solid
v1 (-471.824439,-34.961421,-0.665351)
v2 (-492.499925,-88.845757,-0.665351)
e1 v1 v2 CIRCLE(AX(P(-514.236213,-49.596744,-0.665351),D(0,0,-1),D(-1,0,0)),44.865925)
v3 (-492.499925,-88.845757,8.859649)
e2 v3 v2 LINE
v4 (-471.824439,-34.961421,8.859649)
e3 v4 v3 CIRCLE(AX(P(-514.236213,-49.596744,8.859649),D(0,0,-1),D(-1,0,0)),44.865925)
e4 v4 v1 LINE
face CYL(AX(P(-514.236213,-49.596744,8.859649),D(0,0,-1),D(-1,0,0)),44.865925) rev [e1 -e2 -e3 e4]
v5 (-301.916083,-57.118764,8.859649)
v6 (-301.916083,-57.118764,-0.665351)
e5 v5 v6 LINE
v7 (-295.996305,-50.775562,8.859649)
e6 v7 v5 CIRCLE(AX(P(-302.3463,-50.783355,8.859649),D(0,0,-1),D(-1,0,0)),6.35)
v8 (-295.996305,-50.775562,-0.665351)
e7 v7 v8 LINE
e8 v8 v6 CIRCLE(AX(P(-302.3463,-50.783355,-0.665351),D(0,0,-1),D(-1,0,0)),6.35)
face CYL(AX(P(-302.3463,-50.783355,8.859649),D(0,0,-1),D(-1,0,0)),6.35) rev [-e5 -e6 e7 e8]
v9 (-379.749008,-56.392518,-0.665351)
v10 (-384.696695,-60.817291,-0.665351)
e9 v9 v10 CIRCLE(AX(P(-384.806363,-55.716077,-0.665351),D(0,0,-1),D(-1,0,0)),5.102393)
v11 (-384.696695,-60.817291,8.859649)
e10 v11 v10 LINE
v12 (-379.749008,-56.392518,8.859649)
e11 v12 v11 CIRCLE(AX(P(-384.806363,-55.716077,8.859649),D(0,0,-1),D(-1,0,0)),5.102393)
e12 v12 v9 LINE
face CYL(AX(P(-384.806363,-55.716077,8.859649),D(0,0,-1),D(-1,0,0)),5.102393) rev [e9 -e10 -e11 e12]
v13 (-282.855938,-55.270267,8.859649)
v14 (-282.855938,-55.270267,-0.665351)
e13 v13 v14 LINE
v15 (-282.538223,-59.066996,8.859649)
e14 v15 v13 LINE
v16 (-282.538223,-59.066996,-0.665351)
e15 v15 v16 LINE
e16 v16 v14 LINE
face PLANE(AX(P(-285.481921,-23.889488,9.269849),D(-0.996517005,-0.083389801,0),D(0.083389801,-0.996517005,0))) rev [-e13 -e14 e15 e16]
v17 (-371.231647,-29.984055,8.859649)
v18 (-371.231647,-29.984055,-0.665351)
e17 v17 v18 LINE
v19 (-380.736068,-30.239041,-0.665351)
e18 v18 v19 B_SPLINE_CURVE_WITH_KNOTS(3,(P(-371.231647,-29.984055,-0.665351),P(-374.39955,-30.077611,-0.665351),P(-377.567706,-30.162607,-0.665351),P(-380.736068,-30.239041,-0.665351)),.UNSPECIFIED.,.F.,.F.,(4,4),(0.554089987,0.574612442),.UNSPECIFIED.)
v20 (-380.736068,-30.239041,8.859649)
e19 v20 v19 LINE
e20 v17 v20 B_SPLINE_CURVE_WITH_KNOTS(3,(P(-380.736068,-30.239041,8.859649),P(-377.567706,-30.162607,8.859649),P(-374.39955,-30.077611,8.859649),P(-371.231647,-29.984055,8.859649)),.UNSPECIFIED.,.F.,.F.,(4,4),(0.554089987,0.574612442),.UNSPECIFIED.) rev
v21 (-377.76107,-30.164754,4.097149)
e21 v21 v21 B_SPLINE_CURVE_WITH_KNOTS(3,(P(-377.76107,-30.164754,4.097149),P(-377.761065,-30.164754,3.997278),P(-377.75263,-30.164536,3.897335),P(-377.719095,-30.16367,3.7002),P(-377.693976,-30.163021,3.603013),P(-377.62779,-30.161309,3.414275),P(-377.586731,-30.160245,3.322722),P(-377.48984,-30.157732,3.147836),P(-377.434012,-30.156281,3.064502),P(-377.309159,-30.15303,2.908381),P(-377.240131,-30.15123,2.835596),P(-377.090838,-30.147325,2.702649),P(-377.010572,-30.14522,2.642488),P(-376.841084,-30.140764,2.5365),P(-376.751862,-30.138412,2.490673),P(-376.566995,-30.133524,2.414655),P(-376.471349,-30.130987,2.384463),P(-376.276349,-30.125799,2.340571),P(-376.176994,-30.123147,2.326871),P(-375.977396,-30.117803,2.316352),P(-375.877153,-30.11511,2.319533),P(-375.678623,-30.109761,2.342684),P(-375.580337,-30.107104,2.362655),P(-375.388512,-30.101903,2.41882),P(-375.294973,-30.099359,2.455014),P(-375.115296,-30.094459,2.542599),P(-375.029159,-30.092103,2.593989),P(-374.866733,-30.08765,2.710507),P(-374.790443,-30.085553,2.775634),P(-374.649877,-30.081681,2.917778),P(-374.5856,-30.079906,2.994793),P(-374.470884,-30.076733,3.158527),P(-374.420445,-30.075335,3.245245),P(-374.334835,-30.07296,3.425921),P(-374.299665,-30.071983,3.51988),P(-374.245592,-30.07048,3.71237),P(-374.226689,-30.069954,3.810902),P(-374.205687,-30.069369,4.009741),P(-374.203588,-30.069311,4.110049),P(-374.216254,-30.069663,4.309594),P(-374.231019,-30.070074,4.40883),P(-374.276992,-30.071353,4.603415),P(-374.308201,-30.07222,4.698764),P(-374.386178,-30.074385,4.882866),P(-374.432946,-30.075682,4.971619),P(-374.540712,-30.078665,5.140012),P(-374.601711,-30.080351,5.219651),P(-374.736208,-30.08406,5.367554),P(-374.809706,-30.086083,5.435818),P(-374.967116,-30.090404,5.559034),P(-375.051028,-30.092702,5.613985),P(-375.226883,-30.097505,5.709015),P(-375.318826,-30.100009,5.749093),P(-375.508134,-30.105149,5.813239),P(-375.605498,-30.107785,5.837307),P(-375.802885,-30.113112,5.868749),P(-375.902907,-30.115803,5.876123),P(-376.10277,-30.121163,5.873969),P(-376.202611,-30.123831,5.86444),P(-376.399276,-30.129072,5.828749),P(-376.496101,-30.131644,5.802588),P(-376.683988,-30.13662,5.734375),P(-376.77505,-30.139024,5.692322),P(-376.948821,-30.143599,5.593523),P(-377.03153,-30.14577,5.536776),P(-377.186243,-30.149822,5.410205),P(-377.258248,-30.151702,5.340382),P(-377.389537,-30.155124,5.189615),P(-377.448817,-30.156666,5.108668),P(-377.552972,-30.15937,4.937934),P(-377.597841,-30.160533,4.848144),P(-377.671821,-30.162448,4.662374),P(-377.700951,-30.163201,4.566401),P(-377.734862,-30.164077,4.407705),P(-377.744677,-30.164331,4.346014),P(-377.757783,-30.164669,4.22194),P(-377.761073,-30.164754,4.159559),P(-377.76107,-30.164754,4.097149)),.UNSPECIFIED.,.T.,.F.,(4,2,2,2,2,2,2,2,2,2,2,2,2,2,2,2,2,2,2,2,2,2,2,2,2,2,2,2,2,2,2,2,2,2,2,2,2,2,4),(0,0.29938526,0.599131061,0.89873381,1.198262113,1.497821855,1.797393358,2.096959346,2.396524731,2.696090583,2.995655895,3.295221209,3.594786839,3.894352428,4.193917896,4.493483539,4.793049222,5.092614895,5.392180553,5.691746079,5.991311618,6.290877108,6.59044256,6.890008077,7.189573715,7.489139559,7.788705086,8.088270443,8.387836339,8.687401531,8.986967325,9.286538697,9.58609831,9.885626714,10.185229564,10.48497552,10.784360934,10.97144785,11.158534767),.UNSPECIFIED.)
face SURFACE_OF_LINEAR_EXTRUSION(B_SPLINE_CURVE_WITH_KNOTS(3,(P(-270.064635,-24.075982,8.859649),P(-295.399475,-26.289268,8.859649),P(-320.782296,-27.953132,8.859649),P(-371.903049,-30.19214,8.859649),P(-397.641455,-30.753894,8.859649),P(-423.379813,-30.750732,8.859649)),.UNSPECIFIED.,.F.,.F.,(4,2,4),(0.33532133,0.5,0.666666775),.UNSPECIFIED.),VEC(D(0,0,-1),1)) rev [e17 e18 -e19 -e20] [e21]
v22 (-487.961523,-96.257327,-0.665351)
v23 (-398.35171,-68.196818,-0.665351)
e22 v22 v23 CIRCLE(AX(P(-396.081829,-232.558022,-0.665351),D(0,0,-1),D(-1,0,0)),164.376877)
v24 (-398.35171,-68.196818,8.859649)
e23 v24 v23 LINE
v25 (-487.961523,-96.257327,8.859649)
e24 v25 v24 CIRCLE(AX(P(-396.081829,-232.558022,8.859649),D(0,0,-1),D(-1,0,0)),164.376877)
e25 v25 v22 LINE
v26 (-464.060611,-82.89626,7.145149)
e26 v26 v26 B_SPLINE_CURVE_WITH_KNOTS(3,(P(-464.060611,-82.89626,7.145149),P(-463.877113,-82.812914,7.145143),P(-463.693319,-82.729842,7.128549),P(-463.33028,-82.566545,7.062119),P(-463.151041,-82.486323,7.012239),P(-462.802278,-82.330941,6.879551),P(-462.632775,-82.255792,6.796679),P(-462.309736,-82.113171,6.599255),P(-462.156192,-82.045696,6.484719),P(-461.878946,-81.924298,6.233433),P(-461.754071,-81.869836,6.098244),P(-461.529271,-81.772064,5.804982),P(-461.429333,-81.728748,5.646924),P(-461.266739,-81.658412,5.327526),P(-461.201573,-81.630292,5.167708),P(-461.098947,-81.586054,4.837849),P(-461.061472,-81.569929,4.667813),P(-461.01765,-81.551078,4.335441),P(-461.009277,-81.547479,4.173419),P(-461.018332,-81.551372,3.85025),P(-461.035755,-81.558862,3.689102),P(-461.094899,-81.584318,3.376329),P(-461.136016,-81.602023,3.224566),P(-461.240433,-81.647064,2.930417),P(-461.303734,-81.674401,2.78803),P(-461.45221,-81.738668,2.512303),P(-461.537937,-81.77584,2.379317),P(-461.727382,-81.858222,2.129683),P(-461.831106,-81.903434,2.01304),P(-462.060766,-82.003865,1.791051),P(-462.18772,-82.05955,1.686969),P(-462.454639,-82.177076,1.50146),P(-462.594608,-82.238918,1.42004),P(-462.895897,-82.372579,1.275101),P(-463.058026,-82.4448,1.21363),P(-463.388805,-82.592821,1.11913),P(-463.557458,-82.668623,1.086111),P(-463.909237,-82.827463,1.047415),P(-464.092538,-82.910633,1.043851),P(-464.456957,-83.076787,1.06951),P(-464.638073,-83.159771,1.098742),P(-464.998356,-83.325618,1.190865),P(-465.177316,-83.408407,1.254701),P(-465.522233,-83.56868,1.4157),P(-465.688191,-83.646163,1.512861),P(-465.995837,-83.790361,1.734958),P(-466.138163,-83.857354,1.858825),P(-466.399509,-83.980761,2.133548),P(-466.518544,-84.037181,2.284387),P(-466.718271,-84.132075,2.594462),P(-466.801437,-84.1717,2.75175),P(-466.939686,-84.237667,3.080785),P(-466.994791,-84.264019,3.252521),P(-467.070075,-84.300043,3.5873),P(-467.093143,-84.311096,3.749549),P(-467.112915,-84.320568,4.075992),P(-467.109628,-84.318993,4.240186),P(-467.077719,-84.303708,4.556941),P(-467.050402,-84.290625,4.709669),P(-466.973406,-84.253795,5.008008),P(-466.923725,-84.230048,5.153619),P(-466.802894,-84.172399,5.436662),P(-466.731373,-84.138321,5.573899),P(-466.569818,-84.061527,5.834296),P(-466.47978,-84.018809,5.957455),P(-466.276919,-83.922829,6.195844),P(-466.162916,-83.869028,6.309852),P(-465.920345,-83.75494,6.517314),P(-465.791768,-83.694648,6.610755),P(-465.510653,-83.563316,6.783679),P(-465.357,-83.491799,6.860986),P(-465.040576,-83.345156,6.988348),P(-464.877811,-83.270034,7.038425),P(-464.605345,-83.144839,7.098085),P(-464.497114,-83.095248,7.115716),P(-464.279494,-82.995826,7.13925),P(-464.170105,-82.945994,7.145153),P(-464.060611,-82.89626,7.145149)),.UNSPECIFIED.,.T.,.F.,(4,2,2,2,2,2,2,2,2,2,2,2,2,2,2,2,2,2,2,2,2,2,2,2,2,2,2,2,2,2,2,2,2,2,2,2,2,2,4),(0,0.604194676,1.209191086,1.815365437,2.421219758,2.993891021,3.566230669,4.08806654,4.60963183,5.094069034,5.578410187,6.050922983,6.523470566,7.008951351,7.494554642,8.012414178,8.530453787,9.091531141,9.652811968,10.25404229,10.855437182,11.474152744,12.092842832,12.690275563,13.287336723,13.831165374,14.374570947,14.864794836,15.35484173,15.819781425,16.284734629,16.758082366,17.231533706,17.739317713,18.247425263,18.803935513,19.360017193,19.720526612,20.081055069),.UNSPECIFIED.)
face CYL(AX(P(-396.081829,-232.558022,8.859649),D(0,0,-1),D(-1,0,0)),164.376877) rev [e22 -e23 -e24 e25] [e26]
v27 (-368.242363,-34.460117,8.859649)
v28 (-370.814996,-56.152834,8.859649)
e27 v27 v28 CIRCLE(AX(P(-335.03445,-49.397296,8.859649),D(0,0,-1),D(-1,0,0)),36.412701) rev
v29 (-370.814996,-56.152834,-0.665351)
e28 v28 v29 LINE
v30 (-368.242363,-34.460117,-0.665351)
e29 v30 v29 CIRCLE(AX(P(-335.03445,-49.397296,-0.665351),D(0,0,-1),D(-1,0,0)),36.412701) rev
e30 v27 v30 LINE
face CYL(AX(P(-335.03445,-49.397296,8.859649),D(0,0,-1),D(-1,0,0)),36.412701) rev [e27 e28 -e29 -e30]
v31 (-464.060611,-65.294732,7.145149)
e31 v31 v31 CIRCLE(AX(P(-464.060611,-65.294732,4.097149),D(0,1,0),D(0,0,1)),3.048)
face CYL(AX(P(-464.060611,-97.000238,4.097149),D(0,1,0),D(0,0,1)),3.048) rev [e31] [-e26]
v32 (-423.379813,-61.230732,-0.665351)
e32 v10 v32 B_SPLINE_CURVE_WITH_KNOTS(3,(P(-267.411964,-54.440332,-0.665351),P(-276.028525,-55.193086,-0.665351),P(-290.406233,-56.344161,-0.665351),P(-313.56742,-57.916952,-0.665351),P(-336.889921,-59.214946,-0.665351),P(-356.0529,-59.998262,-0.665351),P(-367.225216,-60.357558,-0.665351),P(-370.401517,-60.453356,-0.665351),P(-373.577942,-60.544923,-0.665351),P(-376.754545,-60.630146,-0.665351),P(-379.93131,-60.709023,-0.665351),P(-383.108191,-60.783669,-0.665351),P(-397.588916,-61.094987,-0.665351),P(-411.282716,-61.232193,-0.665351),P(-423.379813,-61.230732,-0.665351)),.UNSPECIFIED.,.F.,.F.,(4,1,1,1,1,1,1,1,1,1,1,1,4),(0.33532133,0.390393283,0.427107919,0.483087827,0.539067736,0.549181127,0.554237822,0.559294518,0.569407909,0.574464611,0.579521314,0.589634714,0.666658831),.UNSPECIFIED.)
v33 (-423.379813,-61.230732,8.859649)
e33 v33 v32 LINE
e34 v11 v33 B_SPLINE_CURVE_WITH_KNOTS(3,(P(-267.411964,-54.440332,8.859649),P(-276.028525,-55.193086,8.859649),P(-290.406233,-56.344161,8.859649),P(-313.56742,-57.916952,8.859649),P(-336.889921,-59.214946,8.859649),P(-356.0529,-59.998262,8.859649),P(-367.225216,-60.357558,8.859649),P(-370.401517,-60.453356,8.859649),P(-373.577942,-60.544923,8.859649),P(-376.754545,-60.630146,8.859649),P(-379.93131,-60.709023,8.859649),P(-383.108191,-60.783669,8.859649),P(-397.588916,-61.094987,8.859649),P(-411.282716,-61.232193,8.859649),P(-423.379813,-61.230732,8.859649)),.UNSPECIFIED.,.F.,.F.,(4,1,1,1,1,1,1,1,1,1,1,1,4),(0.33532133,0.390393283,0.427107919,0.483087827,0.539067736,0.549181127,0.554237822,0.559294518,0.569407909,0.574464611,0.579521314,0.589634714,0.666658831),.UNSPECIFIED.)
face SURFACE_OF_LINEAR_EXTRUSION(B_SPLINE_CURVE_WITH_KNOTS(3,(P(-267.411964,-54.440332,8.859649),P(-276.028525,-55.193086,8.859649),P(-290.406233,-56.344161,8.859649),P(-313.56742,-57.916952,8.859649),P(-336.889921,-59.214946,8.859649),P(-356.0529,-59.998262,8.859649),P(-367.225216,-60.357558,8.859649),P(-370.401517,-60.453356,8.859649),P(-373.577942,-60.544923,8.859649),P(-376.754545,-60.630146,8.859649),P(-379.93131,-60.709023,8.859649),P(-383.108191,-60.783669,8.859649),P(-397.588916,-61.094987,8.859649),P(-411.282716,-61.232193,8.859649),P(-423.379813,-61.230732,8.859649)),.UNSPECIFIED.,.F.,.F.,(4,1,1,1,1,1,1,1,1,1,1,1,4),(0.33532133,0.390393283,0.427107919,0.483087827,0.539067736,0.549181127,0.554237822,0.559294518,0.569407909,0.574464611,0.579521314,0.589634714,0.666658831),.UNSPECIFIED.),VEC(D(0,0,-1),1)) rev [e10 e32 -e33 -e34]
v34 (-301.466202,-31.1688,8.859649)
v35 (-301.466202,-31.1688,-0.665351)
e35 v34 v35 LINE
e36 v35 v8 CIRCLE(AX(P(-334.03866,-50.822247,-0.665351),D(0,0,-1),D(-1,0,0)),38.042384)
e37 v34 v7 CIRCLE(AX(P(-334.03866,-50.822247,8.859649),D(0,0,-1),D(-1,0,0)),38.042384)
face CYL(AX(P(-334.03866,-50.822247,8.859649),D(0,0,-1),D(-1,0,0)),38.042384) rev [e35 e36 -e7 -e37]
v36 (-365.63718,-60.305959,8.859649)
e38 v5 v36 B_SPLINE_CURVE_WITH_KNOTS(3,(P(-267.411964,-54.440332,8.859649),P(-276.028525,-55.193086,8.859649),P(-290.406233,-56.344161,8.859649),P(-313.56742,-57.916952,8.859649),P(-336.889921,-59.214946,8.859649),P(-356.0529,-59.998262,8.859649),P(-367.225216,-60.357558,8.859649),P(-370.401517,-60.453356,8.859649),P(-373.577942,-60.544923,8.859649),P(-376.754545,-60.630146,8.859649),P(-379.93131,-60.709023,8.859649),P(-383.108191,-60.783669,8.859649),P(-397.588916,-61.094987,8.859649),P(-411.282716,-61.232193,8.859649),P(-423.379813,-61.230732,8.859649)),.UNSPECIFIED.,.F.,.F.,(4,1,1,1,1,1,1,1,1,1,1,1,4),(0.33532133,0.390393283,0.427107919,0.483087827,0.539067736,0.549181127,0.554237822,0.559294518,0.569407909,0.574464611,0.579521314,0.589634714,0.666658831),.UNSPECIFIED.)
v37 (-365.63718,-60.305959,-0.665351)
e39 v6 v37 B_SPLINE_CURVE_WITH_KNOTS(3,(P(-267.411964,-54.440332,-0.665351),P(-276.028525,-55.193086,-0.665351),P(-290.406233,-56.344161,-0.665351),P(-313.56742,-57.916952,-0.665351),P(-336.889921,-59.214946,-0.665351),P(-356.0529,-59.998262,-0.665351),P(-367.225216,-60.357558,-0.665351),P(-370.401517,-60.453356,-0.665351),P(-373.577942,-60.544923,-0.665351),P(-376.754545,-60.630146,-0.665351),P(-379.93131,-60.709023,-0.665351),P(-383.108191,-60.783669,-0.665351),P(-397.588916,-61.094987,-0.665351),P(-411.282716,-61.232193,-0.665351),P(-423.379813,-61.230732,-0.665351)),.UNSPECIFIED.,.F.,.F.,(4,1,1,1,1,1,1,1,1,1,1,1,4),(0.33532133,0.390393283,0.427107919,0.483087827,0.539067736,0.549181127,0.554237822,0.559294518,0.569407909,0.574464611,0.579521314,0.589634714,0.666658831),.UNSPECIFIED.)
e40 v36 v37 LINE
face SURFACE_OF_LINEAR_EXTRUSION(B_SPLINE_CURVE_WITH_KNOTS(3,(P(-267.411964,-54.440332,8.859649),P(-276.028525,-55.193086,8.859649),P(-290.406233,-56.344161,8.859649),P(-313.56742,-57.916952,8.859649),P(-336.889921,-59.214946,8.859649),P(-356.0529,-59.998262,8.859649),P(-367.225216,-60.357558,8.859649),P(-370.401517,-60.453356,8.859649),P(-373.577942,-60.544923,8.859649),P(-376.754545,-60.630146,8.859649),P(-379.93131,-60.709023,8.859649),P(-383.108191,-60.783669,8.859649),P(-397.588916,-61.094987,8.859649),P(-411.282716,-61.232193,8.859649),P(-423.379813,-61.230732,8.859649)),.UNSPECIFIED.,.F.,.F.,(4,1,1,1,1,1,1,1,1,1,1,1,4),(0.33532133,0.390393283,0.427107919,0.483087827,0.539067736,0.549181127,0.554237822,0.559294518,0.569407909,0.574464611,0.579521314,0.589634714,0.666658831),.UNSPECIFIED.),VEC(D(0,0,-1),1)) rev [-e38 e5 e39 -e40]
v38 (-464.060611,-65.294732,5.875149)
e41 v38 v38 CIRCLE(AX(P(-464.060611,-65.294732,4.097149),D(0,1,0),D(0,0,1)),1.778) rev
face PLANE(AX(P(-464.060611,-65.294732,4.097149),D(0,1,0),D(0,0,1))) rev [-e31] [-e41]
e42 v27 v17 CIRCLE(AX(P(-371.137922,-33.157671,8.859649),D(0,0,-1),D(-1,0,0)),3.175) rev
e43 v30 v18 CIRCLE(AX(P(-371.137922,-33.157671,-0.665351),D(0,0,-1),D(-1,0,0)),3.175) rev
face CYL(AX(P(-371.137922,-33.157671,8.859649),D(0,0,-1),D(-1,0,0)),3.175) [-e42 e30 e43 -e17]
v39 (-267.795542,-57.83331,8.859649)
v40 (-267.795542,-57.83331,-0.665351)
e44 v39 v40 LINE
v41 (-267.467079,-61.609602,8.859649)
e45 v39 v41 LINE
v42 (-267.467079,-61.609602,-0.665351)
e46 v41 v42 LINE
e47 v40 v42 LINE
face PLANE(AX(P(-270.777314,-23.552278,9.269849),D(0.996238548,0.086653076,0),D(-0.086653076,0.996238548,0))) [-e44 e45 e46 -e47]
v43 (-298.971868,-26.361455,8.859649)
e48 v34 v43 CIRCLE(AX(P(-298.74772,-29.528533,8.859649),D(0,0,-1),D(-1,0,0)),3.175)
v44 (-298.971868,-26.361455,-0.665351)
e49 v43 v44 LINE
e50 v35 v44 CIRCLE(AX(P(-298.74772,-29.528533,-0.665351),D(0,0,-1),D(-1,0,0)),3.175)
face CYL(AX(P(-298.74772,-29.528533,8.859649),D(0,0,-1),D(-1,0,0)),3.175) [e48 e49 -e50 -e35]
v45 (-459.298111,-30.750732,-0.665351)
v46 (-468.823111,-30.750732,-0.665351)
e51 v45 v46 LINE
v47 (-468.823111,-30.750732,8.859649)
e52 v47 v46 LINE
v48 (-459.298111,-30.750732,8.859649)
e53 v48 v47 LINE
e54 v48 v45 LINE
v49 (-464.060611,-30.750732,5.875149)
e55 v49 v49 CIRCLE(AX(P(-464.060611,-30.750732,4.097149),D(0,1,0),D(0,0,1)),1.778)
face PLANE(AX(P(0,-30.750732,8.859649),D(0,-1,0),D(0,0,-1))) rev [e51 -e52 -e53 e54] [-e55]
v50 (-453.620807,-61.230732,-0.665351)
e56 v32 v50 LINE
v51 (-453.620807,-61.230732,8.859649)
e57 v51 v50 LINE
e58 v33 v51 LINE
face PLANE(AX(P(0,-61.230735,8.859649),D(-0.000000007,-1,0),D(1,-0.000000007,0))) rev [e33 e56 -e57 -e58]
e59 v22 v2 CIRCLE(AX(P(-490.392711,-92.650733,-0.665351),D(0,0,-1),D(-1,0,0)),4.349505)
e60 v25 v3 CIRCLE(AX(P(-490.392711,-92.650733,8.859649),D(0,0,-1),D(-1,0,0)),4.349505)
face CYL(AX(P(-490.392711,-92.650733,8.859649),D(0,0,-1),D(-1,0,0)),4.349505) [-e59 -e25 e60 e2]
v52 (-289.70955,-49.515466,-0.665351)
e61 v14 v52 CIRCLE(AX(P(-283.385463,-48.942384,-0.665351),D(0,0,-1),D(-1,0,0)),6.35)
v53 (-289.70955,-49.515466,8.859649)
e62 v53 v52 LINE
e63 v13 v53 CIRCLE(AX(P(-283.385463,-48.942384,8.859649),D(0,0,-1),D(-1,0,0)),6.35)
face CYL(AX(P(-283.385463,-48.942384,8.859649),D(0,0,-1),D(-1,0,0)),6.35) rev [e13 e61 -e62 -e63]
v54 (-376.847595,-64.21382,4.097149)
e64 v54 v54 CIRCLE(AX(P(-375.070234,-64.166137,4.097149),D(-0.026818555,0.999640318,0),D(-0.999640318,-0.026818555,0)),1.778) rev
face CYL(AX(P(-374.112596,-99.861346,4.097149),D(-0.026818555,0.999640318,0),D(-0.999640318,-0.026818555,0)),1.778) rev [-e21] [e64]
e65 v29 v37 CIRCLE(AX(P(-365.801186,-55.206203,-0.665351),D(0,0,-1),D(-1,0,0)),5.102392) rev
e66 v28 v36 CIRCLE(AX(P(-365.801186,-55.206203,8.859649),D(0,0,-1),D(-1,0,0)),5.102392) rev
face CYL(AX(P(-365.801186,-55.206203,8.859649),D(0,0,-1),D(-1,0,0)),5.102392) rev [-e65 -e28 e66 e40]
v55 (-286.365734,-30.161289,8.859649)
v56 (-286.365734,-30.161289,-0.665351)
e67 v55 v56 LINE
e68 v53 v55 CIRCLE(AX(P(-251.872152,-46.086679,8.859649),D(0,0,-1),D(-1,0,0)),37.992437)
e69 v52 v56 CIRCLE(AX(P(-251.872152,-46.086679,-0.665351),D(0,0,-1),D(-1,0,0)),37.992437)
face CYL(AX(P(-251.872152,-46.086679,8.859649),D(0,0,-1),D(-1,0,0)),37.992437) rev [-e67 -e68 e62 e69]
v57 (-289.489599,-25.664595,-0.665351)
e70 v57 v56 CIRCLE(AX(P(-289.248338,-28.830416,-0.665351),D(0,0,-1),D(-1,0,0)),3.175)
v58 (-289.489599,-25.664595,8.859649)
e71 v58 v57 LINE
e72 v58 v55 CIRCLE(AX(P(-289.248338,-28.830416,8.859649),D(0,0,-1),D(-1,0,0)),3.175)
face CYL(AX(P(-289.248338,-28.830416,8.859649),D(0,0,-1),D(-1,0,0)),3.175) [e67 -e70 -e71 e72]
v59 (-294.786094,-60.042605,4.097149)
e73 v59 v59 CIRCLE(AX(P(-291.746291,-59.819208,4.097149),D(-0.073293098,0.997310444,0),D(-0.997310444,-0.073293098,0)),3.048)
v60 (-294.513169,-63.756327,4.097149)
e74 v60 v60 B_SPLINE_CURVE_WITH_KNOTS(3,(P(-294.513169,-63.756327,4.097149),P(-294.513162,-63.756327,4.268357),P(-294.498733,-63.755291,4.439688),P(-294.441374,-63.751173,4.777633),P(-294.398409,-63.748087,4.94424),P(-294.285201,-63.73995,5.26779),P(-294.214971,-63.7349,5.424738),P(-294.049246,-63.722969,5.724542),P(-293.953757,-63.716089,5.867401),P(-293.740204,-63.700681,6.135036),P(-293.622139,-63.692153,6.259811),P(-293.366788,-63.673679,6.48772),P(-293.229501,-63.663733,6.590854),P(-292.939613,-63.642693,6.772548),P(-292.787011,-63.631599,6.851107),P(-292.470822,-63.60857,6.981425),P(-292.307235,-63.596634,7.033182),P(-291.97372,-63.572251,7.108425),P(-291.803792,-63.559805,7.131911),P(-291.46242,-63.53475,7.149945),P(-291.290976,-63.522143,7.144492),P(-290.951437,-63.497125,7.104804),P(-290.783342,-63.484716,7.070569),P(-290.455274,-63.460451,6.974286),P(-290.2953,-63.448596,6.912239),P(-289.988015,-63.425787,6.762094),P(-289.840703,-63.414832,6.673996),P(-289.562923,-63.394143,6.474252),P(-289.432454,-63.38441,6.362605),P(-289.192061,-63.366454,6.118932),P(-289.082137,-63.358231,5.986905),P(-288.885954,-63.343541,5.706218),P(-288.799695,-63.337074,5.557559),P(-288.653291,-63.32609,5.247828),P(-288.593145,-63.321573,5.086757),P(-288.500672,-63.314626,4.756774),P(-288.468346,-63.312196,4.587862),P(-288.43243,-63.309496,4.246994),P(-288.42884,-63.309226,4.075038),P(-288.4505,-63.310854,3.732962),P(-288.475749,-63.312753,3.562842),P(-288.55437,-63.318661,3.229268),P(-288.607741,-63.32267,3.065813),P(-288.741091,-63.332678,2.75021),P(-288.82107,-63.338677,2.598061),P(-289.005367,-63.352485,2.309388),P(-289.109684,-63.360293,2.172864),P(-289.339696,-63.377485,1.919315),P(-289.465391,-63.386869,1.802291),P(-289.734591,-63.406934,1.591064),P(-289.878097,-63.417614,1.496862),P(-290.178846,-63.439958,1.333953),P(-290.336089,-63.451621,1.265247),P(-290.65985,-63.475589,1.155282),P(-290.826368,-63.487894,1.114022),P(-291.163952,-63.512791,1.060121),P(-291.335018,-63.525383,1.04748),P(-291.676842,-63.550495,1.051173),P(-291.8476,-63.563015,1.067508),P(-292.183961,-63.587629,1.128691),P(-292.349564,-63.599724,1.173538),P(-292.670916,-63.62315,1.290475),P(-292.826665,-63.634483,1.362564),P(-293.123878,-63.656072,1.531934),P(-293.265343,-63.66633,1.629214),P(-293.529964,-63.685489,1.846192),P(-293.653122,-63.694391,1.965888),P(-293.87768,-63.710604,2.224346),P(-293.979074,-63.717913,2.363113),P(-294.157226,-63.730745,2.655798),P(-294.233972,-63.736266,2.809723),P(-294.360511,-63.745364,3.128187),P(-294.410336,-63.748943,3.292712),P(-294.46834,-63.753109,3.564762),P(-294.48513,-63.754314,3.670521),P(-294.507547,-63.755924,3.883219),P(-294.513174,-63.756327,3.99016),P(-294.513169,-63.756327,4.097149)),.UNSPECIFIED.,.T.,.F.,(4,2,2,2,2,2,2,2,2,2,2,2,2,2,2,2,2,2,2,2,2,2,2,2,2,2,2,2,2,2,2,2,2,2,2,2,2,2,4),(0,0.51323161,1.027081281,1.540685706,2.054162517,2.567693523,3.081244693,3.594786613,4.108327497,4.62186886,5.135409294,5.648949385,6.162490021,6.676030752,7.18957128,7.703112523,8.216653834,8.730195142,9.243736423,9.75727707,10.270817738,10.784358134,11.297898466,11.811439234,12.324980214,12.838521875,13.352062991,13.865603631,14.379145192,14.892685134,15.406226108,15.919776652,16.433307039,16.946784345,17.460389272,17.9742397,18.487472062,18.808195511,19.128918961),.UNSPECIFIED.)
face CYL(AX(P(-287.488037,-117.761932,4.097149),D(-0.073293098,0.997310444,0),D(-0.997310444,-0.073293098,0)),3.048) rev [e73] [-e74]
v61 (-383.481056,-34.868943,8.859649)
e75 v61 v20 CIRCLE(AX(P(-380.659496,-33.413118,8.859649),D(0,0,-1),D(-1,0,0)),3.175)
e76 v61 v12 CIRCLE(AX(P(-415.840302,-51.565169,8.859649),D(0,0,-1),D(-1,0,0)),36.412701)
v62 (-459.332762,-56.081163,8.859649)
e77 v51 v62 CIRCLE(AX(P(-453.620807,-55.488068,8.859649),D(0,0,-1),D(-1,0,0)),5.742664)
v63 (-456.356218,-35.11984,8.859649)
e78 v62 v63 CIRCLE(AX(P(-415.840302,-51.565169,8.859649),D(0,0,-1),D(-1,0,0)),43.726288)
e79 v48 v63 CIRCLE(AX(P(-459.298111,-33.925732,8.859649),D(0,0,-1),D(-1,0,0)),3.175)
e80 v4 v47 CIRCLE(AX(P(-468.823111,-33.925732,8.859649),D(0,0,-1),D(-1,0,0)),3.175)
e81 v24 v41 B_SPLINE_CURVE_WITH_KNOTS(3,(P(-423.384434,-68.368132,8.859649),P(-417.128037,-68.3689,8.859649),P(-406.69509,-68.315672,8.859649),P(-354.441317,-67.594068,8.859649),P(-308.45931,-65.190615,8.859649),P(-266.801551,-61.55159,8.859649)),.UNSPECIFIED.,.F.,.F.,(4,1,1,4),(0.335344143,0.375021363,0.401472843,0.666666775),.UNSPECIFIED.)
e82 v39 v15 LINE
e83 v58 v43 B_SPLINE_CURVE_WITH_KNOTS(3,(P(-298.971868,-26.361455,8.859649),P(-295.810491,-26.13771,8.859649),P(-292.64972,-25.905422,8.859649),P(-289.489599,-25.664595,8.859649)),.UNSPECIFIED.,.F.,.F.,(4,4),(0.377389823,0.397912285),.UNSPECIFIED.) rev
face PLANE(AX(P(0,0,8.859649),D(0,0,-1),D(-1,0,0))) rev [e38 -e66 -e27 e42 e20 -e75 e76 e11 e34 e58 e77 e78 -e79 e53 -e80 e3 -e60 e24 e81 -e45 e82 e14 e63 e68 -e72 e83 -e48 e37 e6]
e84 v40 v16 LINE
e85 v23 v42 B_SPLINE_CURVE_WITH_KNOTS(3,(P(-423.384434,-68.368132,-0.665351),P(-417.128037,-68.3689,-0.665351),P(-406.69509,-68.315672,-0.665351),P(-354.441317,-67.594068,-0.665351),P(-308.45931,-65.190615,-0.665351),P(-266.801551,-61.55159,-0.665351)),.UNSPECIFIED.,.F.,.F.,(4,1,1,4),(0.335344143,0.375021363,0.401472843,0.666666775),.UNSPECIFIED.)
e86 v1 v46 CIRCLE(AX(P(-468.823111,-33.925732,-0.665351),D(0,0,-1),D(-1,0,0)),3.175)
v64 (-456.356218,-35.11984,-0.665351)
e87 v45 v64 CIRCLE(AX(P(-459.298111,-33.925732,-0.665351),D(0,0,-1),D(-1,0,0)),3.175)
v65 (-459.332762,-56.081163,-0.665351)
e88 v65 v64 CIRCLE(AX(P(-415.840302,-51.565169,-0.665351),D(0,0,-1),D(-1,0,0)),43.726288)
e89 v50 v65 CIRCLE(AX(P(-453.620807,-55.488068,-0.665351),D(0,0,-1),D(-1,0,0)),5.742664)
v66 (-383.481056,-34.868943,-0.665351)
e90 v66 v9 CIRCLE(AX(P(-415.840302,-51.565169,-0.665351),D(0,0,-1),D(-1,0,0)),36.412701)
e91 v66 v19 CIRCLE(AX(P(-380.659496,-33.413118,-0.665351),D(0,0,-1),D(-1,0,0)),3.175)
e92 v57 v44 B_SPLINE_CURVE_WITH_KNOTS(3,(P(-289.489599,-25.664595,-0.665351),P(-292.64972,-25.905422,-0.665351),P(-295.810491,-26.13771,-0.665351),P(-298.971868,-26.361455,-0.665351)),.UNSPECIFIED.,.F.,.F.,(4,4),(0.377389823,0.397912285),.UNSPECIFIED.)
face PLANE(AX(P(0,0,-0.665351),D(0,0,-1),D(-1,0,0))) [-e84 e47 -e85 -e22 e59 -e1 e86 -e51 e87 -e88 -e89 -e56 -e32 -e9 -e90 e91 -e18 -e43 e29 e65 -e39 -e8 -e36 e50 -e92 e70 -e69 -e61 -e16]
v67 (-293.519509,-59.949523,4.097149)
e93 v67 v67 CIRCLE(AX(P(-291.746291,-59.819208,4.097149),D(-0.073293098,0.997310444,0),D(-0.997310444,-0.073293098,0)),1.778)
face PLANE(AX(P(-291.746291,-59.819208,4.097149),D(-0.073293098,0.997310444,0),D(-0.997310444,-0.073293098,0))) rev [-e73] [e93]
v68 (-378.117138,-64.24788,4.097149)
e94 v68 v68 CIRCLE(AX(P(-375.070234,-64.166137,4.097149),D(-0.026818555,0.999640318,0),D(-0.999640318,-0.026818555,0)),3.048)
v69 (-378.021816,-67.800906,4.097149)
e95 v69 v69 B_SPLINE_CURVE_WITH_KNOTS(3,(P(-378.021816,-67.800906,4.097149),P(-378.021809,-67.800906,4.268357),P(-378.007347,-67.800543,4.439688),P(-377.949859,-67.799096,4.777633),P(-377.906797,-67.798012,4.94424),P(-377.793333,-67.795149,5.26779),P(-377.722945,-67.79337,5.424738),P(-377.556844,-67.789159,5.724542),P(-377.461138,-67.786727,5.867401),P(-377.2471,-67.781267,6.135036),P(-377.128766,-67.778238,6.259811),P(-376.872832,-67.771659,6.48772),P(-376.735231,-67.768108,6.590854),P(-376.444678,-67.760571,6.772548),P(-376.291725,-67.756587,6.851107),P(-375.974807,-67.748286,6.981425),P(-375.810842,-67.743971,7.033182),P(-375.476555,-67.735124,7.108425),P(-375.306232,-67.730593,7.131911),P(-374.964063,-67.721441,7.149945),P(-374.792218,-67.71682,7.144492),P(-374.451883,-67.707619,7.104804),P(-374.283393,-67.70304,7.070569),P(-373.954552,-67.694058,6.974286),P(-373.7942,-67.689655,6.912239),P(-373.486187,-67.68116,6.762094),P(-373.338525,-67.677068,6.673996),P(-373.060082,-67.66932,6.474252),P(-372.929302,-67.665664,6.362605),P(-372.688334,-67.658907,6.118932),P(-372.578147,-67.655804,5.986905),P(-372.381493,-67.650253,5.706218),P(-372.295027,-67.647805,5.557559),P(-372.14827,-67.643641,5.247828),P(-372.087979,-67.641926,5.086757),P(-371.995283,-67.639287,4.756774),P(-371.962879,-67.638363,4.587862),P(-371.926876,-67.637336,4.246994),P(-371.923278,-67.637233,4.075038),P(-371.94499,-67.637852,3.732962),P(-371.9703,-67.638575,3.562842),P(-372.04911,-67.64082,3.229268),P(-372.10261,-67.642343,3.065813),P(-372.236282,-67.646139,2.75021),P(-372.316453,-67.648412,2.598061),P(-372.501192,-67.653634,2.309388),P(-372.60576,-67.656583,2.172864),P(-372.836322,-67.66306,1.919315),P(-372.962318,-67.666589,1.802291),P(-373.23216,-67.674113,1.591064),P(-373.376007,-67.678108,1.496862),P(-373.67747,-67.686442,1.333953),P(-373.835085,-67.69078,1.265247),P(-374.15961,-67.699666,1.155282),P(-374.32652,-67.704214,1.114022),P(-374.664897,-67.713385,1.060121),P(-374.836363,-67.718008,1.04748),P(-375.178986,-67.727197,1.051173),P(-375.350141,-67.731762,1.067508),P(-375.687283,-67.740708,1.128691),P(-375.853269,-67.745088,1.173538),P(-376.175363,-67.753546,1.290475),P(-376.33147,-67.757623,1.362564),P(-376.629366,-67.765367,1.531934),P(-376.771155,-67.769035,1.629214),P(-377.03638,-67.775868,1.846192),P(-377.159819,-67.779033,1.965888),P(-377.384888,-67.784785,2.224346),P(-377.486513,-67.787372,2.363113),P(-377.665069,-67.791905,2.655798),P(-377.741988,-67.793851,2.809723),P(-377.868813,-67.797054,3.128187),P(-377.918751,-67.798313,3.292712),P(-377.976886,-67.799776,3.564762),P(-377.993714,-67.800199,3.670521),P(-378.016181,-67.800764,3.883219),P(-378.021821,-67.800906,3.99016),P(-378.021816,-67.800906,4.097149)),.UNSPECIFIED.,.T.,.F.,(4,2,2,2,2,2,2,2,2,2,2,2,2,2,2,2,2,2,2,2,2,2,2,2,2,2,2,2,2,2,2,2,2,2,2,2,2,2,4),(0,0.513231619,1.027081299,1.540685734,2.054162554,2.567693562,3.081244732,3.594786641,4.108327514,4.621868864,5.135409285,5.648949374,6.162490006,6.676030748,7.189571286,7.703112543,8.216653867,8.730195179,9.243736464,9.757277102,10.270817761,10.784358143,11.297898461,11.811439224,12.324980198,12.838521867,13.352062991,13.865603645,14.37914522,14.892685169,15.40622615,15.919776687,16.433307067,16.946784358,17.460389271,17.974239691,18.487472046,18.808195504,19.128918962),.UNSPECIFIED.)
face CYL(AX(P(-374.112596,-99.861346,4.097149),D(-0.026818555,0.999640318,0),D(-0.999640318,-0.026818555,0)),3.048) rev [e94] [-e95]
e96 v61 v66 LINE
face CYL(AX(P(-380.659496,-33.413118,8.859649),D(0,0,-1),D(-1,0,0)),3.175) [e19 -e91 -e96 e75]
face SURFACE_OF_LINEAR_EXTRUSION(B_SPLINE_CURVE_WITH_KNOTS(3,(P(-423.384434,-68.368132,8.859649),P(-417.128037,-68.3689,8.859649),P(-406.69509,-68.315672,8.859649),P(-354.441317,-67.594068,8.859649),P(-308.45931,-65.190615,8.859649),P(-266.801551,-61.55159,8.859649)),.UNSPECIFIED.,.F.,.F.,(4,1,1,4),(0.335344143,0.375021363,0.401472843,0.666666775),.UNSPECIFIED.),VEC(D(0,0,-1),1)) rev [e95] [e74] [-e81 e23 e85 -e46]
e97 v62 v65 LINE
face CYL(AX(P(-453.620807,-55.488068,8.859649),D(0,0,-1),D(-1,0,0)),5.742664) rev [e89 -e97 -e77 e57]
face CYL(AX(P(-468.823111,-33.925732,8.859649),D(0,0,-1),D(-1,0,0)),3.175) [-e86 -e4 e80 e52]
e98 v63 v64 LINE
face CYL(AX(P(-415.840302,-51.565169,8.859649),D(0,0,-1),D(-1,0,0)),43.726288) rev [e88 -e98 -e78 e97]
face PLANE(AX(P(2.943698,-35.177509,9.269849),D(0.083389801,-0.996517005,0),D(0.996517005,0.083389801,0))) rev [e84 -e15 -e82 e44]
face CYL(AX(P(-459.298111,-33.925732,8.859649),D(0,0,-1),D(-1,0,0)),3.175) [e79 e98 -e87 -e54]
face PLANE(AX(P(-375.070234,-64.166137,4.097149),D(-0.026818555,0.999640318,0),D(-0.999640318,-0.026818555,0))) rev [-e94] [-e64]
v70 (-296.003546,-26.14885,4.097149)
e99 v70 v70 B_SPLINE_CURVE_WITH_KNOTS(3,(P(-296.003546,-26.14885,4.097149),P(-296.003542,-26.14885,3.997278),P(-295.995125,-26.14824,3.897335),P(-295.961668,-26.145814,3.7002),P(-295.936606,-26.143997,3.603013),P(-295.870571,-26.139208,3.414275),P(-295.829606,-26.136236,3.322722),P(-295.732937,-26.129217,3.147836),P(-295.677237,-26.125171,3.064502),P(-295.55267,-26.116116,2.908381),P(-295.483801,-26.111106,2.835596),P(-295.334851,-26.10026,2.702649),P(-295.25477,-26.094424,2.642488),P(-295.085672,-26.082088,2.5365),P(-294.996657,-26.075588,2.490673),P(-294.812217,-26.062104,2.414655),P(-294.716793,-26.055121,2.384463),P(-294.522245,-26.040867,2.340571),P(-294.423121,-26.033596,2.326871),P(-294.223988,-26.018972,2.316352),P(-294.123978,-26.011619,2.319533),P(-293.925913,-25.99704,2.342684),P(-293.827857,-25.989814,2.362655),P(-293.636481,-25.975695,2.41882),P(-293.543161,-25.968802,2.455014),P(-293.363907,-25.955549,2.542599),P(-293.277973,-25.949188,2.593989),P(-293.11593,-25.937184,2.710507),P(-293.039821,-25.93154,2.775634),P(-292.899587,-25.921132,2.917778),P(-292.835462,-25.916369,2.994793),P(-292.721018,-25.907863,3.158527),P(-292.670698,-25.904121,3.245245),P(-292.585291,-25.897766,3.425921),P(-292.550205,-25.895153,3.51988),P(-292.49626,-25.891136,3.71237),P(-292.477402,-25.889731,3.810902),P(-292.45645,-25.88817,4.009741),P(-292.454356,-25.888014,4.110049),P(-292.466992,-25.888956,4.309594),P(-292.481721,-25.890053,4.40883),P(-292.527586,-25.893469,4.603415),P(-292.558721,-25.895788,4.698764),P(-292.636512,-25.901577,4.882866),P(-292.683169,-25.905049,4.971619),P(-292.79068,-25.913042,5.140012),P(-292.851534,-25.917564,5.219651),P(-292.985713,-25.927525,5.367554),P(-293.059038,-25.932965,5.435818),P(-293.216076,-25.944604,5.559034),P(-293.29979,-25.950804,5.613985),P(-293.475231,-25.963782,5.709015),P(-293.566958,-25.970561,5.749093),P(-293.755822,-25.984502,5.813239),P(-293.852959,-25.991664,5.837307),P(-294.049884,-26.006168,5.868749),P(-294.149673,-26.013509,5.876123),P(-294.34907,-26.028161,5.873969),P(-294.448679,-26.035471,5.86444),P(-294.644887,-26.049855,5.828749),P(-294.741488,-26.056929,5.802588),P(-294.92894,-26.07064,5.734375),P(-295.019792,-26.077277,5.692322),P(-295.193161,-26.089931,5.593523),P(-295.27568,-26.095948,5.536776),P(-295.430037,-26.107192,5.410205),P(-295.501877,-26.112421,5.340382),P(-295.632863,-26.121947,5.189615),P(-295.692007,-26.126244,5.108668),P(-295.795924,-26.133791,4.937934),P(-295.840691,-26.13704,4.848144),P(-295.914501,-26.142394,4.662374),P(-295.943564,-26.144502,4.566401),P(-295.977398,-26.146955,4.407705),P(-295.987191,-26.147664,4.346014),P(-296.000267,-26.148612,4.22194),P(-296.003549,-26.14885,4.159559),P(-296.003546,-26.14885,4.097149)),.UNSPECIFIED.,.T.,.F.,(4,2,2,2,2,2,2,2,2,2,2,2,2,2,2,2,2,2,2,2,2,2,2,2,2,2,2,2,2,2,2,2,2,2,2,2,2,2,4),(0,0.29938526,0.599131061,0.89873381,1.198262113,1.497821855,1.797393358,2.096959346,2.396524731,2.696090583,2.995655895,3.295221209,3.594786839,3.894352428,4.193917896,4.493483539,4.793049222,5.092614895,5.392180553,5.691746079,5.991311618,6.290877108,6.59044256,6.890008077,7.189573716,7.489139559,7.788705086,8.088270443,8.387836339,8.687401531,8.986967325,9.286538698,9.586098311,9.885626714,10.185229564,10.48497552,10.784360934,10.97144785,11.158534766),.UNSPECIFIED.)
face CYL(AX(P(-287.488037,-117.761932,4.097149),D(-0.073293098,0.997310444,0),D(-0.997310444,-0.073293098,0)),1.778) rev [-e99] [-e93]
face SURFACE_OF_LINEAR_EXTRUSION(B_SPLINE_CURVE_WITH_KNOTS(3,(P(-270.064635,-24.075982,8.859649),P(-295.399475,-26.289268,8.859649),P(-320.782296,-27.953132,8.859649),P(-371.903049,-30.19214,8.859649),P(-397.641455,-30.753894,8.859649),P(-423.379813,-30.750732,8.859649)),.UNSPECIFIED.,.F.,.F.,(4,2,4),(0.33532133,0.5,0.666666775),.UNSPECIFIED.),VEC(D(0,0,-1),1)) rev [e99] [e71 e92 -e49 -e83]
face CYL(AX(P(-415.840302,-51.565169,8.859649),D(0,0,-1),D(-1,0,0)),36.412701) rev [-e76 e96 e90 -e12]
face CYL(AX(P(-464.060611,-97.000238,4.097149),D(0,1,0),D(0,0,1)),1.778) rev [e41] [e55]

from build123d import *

# Parameters (mm, degrees)
BOSS_EXTRUDE5_DEPTH      = 4.7625
SKETCH6_R                = 1.778
CUT_EXTRUDE3_DEPTH       = 504.733086563
CUT_EXTRUDE4_START       = 3.556
SKETCH7_R                = 3.048
SKETCH7_R_2              = 1.778
CUT_EXTRUDE4_DEPTH       = 505.502600354
CUT_EXTRUDE5_DEPTH       = 506.075936751
SKETCH10_R               = 1.778
CUT_EXTRUDE6_DEPTH       = 502.305599398
CUT_EXTRUDE11_DEPTH      = 3.556
CUT_EXTRUDE11_DEPTH_BACK = 498.926861427
SKETCH12_R               = 3.048
SKETCH13_R               = 1.778
CUT_EXTRUDE12_DEPTH      = 500.236768439
CUT_EXTRUDE13_DEPTH      = 3.556
CUT_EXTRUDE13_DEPTH_BACK = 497.703321125
SKETCH14_R               = 3.048


with BuildPart() as part:
    # Sketch1 → Boss-Extrude5 (new, symmetric)
    with BuildSketch(Plane(origin=(0, 0, 4.097149242), x_dir=(-1, 0, 0), z_dir=(0, 0, -1))):
        with BuildLine():
            Line((4.980483945, -43.087244707), (5.013364858, -50.687454907))
            add(Edge.make_bspline(
                [(266.801551376, -61.551589611), (261.350884009, -61.078554924), (250.433518448, -60.153958667), (228.701217873, -58.434486699), (190.548987698, -55.763104255), (136.042529388, -52.86929541), (81.4824687, -51.236835025), (43.240954482, -50.737883821), (21.43842692, -50.650632415), (10.483916541, -50.667450636), (5.013364858, -50.687454907)],
                knots=[4.0417e-05, 4.0417e-05, 4.0417e-05, 4.0417e-05, 0.062531963, 0.125023508, 0.2500066, 0.499972783, 0.749938966, 0.874922057, 0.937413603, 0.999905149, 0.999905149, 0.999905149, 0.999905149], degree=3))
            add(Edge.make_bspline(
                [(398.35171036, -68.196818162), (396.265786035, -68.16801087), (352.35609282, -67.485074441), (308.459309619, -65.190615284), (266.801551376, -61.551589611)],
                knots=[0.388247103, 0.388247103, 0.388247103, 0.388247103, 0.401472843, 0.666666775, 0.666666775, 0.666666775, 0.666666775], degree=3))
            ThreePointArc((398.35171036, -68.196818162), (445.202941045, -75.692238551), (487.961522574, -96.257326662))
            ThreePointArc((487.961522574, -96.257326662), (494.102034598, -94.922101367), (492.499924864, -88.845757162))
            ThreePointArc((492.499924864, -88.845757162), (472.347982204, -65.669309605), (471.824439099, -34.961421092))
            ThreePointArc((471.824439099, -34.961421092), (471.408544547, -32.082865726), (468.823110549, -30.750731982))
            Line((468.823110549, -30.750731982), (464.060610549, -30.750731982))
            Line((464.060610549, -30.750731982), (459.298110549, -30.750731982))
            ThreePointArc((459.298110549, -30.750731982), (456.664489609, -32.15241144), (456.356218194, -35.119840174))
            ThreePointArc((456.356218194, -35.119840174), (459.13228847, -45.417631786), (459.332762362, -56.081162557))
            ThreePointArc((459.332762362, -56.081162557), (457.466080253, -59.753283819), (453.620807365, -61.230731982))
            Line((453.620807365, -61.230731985), (423.379813153, -61.230732209))
            add(Edge.make_bspline(
                [(384.69669435, -60.817291115), (385.490946639, -60.834366328), (398.38358415, -61.102948795), (411.282715888, -61.232192999), (423.379813153, -61.230732209)],
                knots=[0.584578013, 0.584578013, 0.584578013, 0.584578013, 0.589634714, 0.666658831, 0.666658831, 0.666658831, 0.666658831], degree=3))
            ThreePointArc((384.69669435, -60.817291115), (381.405012075, -59.519394431), (379.749008052, -56.392517605))
            ThreePointArc((379.749008052, -56.392517605), (379.962938882, -45.344267983), (383.481055682, -34.868942675))
            ThreePointArc((383.481055682, -34.868942675), (383.390574332, -31.793909155), (380.736068027, -30.23904122))
            add(Edge.make_bspline(
                [(380.736068027, -30.23904122), (377.567706075, -30.162607104), (374.399550345, -30.077611409), (371.231646974, -29.984054972)],
                knots=[0.564351213, 0.564351213, 0.564351213, 0.564351213, 0.584873669, 0.584873669, 0.584873669, 0.584873669], degree=3))
            ThreePointArc((371.231646974, -29.984054972), (368.497589908, -31.394357521), (368.242362423, -34.460116848))
            ThreePointArc((368.242362423, -34.460116848), (371.193755284, -45.109007001), (370.814996242, -56.152834368))
            ThreePointArc((370.814996242, -56.152834368), (368.993717842, -59.186422224), (365.637179655, -60.305958598))
            add(Edge.make_bspline(
                [(301.916083239, -57.118764264), (304.793492849, -57.314159562), (316.447125042, -58.077219349), (336.889920622, -59.214945623), (355.259103098, -59.96581465), (364.843153628, -60.280423029), (365.637179655, -60.305958598)],
                knots=[0.408750601, 0.408750601, 0.408750601, 0.408750601, 0.427107919, 0.483087827, 0.539067736, 0.544124431, 0.544124431, 0.544124431, 0.544124431], degree=3))
            ThreePointArc((301.916083239, -57.118764264), (297.703900514, -55.115863145), (295.996304567, -50.7755622))
            ThreePointArc((295.996304567, -50.7755622), (297.395526272, -40.599539879), (301.466201974, -31.168800195))
            ThreePointArc((301.466201974, -31.168800195), (301.565948035, -28.066269557), (298.971867926, -26.361454603))
            add(Edge.make_bspline(
                [(289.489598636, -25.664595471), (292.649719638, -25.90542225), (295.810491414, -26.137709697), (298.971867926, -26.361454603)],
                knots=[0.377389823, 0.377389823, 0.377389823, 0.377389823, 0.397912285, 0.397912285, 0.397912285, 0.397912285], degree=3))
            ThreePointArc((289.489598636, -25.664595471), (286.640803233, -27.018955044), (286.365734252, -30.161288915))
            ThreePointArc((286.365734252, -30.161288915), (289.309950073, -39.618561113), (289.709550194, -49.515465879))
            ThreePointArc((289.709550194, -49.515465879), (287.468803622, -53.805389908), (282.855937937, -55.270266537))
            Line((282.855937937, -55.270266537), (268.113256948, -54.036580381))
            add(Edge.make_bspline(
                [(268.113256948, -54.036580381), (262.634745624, -53.56111419), (251.663313863, -52.628696852), (229.81175043, -50.89541865), (191.471827261, -48.203857237), (136.679597141, -45.286916485), (81.835702382, -43.641470214), (43.402846546, -43.138474088), (21.480818831, -43.050269737), (10.476996172, -43.067138198), (4.980483945, -43.087244707)],
                knots=[-0.002434158, -0.002434158, -0.002434158, -0.002434158, 0.060213256, 0.12286067, 0.248155497, 0.498745152, 0.749334808, 0.874629635, 0.937277049, 0.999924463, 0.999924463, 0.999924463, 0.999924463], degree=3))
        make_face()
    boss_extrude5 = extrude(amount=BOSS_EXTRUDE5_DEPTH, both=True)

    # Sketch6 → Cut-Extrude3 (cut, through all)
    with BuildSketch(Plane(origin=(0.32087569, -4.366204823, 0), x_dir=(0.9973104440526221, 0.07329309778936742, 0), z_dir=(-0.07329309778936742, 0.9973104440526221, 0))):
        with Locations((-295.34595845, -4.097149242)):
            Circle(SKETCH6_R)
    cut_extrude3 = extrude(amount=-CUT_EXTRUDE3_DEPTH, mode=Mode.SUBTRACT)

    # Sketch7 → Cut-Extrude4 (cut)
    with BuildSketch(Plane(origin=(3.065947832, -41.718823267, 0), x_dir=(-0.9946544730103679, -0.07309790847145088, 0.07293267510222654), z_dir=(-0.07329309778936742, 0.9973104440526221, 0)).offset(CUT_EXTRUDE4_START)):
        with Locations((294.858228733, -17.454132845)):
            Circle(SKETCH7_R)
        with Locations((294.858228733, -17.454132845)):
            Circle(SKETCH7_R_2, mode=Mode.SUBTRACT)
    cut_extrude4 = extrude(amount=-CUT_EXTRUDE4_DEPTH, mode=Mode.SUBTRACT)

    # Mirror4: Boss-Extrude5, Cut-Extrude3, Cut-Extrude4 across plane
    add(boss_extrude5.mirror(Plane(origin=(-4.793985166, 0.020740296, 8.859649242), x_dir=(0, 0, 1), z_dir=(-0.9999906416249494, 0.004326275825933448, 0))))
    add(cut_extrude3.mirror(Plane(origin=(-4.793985166, 0.020740296, 8.859649242), x_dir=(0, 0, 1), z_dir=(-0.9999906416249494, 0.004326275825933448, 0))), mode=Mode.SUBTRACT)
    add(cut_extrude4.mirror(Plane(origin=(-4.793985166, 0.020740296, 8.859649242), x_dir=(0, 0, 1), z_dir=(-0.9999906416249494, 0.004326275825933448, 0))), mode=Mode.SUBTRACT)

    # Sketch9 → Cut-Extrude5 (cut, through all)
    with BuildSketch(Plane(origin=(0, 0, -0.665350758), x_dir=(-1, 0, 0), z_dir=(0, 0, -1))):
        Polygon((282.855937937, -55.270266537), (268.113256948, -54.036580381), (271.226711866, -16.830462442), (-501.730233012, -16.830462442), (-501.730233012, -147.179806135), (267.467078991, -61.609602167), (267.795541806, -57.83331017), (282.538222795, -59.066996326), align=None)
    extrude(amount=-CUT_EXTRUDE5_DEPTH, mode=Mode.SUBTRACT)

    # Sketch10 → Cut-Extrude6 (cut, through all)
    with BuildSketch(Plane(origin=(0.536837032, -20.010173799, 0), x_dir=(0.999640317874878, 0.026818554752505906, 0), z_dir=(-0.026818554752505906, 0.999640317874878, 0))):
        with Locations((-376.656171029, -4.097149242)):
            Circle(SKETCH10_R)
    extrude(amount=-CUT_EXTRUDE6_DEPTH, mode=Mode.SUBTRACT)

    # Sketch12 → Cut-Extrude11 (cut, two sides: drawn at the far end of the back side and taken through both)
    with BuildSketch(Plane(origin=(1.545827279, -57.619483473, 0), x_dir=(0.999640317874878, 0.02681855475250591, 0), z_dir=(-0.02681855475250591, 0.999640317874878, 0)).offset(-CUT_EXTRUDE11_DEPTH_BACK)):
        with Locations((-376.656171029, -4.097149242)):
            Circle(SKETCH12_R)
    extrude(amount=CUT_EXTRUDE11_DEPTH + CUT_EXTRUDE11_DEPTH_BACK, mode=Mode.SUBTRACT)

    # Sketch13 → Cut-Extrude12 (cut, through all)
    with BuildSketch(Plane(origin=(0, -30.750731982, 0), x_dir=(1, 0, 0), z_dir=(0, 1, 0))):
        with Locations((-464.060610549, -4.097149242)):
            Circle(SKETCH13_R)
    extrude(amount=-CUT_EXTRUDE12_DEPTH, mode=Mode.SUBTRACT)

    # Sketch14 → Cut-Extrude13 (cut, two sides: drawn at the far end of the back side and taken through both)
    with BuildSketch(Plane(origin=(0, -68.850731982, 0), x_dir=(1, 0, 0), z_dir=(0, 1, 0)).offset(-CUT_EXTRUDE13_DEPTH_BACK)):
        with Locations((-464.060610549, -4.097149242)):
            Circle(SKETCH14_R)
    extrude(amount=CUT_EXTRUDE13_DEPTH + CUT_EXTRUDE13_DEPTH_BACK, mode=Mode.SUBTRACT)


solid = part.part
